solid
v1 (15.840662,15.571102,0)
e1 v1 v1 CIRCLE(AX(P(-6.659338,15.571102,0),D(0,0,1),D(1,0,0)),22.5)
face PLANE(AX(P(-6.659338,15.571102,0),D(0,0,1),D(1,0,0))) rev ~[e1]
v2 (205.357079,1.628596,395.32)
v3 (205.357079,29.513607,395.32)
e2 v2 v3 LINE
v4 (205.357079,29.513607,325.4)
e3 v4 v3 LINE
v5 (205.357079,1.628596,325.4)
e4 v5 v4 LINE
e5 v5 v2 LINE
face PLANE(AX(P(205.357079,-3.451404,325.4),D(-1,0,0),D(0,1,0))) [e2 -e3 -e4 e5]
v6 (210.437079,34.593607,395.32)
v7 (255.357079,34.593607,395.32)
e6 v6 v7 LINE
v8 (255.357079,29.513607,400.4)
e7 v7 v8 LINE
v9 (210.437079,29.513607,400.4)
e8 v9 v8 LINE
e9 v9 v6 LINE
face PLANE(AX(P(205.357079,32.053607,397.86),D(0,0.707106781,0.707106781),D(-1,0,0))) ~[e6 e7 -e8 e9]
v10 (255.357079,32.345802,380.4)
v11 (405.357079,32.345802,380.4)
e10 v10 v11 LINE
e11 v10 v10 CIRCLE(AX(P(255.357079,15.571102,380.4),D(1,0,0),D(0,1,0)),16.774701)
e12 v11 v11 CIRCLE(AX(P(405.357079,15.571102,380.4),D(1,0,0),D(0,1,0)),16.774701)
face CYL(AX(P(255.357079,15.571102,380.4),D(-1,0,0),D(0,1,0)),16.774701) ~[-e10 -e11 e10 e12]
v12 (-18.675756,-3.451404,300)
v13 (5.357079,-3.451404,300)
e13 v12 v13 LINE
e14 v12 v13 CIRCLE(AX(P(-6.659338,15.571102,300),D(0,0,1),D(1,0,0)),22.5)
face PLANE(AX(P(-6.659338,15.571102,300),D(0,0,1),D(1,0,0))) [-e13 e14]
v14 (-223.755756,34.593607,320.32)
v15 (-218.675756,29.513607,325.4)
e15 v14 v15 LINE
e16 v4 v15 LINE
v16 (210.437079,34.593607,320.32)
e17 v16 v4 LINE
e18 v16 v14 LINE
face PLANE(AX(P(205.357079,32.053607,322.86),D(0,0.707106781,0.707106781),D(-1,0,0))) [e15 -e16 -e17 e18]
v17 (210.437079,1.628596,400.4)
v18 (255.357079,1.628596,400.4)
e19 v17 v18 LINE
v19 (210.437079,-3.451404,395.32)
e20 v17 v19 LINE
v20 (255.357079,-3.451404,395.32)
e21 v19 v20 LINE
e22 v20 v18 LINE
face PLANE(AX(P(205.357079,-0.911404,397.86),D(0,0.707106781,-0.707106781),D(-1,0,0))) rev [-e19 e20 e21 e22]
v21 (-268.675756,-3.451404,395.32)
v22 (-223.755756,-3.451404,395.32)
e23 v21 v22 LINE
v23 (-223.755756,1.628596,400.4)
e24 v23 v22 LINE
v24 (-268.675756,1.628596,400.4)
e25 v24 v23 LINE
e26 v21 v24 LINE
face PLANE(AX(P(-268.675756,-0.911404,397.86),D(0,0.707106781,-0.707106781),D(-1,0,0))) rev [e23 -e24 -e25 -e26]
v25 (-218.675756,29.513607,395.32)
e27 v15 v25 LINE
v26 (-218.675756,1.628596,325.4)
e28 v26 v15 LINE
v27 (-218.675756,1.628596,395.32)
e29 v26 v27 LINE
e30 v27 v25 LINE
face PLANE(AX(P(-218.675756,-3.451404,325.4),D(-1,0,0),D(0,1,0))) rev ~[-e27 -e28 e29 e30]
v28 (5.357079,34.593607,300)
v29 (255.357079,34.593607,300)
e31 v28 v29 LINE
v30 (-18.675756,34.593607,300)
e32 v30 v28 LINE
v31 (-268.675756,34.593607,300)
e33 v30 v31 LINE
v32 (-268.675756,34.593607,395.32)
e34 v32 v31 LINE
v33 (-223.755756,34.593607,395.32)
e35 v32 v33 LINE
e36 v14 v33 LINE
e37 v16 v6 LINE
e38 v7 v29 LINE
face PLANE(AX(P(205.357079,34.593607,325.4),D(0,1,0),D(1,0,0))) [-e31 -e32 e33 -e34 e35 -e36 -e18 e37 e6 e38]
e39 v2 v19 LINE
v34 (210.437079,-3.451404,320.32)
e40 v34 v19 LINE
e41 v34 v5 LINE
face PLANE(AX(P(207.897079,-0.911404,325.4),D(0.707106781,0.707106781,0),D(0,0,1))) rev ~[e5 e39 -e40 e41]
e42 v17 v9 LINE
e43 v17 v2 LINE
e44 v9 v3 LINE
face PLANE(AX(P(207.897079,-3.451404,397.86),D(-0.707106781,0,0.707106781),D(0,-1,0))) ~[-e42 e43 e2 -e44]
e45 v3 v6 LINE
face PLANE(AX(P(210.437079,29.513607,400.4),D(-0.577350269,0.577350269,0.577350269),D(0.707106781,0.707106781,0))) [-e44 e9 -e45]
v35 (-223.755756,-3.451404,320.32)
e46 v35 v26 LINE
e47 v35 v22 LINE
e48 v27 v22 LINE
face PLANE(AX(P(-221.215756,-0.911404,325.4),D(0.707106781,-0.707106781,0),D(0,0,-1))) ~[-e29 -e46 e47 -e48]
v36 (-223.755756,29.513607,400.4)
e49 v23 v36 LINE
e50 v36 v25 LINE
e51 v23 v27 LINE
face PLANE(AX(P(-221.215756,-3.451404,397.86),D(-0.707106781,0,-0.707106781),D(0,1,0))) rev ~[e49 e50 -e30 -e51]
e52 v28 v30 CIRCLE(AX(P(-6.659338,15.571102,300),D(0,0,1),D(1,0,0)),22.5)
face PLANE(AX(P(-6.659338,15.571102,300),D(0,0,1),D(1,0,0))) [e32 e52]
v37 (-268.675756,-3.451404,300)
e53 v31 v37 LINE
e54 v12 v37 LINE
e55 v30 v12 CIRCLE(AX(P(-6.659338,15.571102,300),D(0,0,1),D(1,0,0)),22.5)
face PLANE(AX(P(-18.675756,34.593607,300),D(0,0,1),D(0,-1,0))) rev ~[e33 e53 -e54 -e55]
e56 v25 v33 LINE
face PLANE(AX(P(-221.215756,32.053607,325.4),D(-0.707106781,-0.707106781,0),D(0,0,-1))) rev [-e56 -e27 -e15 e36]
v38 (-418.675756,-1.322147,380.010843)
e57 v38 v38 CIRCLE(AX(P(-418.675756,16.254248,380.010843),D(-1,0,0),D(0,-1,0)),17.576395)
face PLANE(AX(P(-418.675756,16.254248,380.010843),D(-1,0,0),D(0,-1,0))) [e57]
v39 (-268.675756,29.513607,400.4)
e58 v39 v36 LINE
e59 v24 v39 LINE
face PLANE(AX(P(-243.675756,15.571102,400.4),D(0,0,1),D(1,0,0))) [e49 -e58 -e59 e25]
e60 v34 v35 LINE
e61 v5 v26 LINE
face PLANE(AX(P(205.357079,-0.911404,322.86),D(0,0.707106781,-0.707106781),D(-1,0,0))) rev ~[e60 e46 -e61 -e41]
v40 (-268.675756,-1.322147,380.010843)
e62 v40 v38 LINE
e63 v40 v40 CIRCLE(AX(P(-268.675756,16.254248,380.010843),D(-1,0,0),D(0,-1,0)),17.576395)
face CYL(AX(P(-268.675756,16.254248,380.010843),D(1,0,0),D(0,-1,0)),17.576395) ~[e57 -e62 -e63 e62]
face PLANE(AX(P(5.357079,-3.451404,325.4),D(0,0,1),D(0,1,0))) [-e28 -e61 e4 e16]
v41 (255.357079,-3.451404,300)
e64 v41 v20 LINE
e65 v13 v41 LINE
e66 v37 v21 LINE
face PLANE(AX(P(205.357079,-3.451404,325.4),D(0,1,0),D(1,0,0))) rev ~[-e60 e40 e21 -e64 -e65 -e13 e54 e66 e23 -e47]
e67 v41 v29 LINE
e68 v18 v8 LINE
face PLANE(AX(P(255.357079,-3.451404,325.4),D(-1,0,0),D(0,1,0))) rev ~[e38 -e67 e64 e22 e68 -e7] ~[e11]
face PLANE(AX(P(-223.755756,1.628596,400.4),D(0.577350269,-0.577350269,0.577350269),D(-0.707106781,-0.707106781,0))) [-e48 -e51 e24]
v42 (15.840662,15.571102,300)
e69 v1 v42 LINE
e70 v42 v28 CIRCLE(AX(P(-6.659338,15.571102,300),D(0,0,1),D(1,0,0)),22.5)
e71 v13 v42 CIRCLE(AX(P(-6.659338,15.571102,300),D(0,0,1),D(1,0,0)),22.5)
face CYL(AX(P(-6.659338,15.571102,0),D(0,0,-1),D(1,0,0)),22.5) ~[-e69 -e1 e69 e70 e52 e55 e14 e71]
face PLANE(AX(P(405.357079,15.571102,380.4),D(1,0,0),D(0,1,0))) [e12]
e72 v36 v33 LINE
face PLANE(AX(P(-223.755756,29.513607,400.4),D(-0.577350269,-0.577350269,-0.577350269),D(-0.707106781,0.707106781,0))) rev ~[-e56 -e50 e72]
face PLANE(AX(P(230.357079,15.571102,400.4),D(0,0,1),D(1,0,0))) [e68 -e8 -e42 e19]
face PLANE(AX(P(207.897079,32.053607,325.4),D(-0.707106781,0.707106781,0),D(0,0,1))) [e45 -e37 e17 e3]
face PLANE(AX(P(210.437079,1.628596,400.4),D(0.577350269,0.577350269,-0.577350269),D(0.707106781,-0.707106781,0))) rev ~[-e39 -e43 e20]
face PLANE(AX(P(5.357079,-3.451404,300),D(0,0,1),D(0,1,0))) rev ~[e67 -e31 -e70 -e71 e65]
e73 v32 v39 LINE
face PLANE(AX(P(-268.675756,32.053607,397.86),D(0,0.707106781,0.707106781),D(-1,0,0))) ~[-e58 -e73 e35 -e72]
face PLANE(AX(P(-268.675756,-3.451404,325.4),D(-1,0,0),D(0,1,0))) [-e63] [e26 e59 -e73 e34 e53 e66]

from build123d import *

# Parameters (mm, degrees)
F0_R      = 22.5
F1_DEPTH  = 300
F2_W      = 24.0328347509
F2_H      = 38.0450108928
F3_DEPTH  = 25.4
F4_W      = 38.0450108928
F4_H      = 25.4
F5_DEPTH  = 250
F6_W      = 50
F6_H      = 38.0450108928
F7_DEPTH  = 75
F9_W      = 38.0450108928
F9_H      = 25.4
F10_DEPTH = 250
F11_W     = 50
F11_H     = 38.0450108928
F12_DEPTH = 75
F13_R     = 16.7747006108
F14_DEPTH = 150
F8_R      = 17.5763954382
F15_DEPTH = 150
F16_SIZE  = 5.08


with BuildPart() as f1:
    # F0 (on Top) → F1 (new body)
    with BuildSketch(Plane.XY):
        with Locations((-6.6593382508, 15.5711015686)):
            Circle(F0_R)
    extrude(amount=F1_DEPTH)

    # F2 (on face) → F3 (join)
    with BuildSketch(Plane.XY.offset(300)):
        with Locations((-6.6593382508, 15.5711015686)):
            Rectangle(F2_W, F2_H)
    extrude(amount=F3_DEPTH)

    # F4 (on face) → F5 (join)
    with BuildSketch(Plane(origin=(-18.6757556262, 0, 0), x_dir=(0, -1, 0), z_dir=(-1, 0, 0))):
        with Locations((-15.5711015686, 312.7)):
            Rectangle(F4_W, F4_H)
    extrude(amount=F5_DEPTH)

    # F6 (on face) → F7 (join)
    with BuildSketch(Plane.XY.offset(325.4)):
        with Locations((-243.6757556262, 15.5711015686)):
            Rectangle(F6_W, F6_H)
    extrude(amount=F7_DEPTH)

    # F9 (on face) → F10 (join)
    with BuildSketch(Plane.YZ.offset(5.3570791247)):
        with Locations((15.5711015686, 312.7)):
            Rectangle(F9_W, F9_H)
    extrude(amount=F10_DEPTH)

    # F11 (on face) → F12 (join)
    with BuildSketch(Plane.XY.offset(325.4)):
        with Locations((230.3570791247, 15.5711015686)):
            Rectangle(F11_W, F11_H)
    extrude(amount=F12_DEPTH)

    # F13 (on face) → F14 (join)
    with BuildSketch(Plane.YZ.offset(255.3570791247)):
        with Locations((15.5711015686, 380.4)):
            Circle(F13_R)
    extrude(amount=F14_DEPTH)

    # F8 (on face) → F15 (join)
    with BuildSketch(Plane(origin=(-268.6757556262, 0, 0), x_dir=(0, -1, 0), z_dir=(-1, 0, 0))):
        with Locations((-16.2542480975, 380.010843277)):
            Circle(F8_R)
    extrude(amount=F15_DEPTH)

    # F16
    f16_edges = [f1.edges().sort_by_distance(p)[0] for p in [
        (-6.659338, -3.451404, 325.4),
        (-6.659338, 34.593607, 325.4),
        (-218.675756, -3.451404, 362.9),
        (-218.675756, 34.593607, 362.9),
        (205.357079, -3.451404, 362.9),
        (205.357079, 34.593607, 362.9),
        (205.357079, 15.571102, 400.4),
        (-218.675756, 15.571102, 400.4),
        (-243.675756, -3.451404, 400.4),
        (-243.675756, 34.593607, 400.4),
        (230.357079, 34.593607, 400.4),
        (230.357079, -3.451404, 400.4),
    ]]
    chamfer(f16_edges, length=F16_SIZE)


solid = f1.part
